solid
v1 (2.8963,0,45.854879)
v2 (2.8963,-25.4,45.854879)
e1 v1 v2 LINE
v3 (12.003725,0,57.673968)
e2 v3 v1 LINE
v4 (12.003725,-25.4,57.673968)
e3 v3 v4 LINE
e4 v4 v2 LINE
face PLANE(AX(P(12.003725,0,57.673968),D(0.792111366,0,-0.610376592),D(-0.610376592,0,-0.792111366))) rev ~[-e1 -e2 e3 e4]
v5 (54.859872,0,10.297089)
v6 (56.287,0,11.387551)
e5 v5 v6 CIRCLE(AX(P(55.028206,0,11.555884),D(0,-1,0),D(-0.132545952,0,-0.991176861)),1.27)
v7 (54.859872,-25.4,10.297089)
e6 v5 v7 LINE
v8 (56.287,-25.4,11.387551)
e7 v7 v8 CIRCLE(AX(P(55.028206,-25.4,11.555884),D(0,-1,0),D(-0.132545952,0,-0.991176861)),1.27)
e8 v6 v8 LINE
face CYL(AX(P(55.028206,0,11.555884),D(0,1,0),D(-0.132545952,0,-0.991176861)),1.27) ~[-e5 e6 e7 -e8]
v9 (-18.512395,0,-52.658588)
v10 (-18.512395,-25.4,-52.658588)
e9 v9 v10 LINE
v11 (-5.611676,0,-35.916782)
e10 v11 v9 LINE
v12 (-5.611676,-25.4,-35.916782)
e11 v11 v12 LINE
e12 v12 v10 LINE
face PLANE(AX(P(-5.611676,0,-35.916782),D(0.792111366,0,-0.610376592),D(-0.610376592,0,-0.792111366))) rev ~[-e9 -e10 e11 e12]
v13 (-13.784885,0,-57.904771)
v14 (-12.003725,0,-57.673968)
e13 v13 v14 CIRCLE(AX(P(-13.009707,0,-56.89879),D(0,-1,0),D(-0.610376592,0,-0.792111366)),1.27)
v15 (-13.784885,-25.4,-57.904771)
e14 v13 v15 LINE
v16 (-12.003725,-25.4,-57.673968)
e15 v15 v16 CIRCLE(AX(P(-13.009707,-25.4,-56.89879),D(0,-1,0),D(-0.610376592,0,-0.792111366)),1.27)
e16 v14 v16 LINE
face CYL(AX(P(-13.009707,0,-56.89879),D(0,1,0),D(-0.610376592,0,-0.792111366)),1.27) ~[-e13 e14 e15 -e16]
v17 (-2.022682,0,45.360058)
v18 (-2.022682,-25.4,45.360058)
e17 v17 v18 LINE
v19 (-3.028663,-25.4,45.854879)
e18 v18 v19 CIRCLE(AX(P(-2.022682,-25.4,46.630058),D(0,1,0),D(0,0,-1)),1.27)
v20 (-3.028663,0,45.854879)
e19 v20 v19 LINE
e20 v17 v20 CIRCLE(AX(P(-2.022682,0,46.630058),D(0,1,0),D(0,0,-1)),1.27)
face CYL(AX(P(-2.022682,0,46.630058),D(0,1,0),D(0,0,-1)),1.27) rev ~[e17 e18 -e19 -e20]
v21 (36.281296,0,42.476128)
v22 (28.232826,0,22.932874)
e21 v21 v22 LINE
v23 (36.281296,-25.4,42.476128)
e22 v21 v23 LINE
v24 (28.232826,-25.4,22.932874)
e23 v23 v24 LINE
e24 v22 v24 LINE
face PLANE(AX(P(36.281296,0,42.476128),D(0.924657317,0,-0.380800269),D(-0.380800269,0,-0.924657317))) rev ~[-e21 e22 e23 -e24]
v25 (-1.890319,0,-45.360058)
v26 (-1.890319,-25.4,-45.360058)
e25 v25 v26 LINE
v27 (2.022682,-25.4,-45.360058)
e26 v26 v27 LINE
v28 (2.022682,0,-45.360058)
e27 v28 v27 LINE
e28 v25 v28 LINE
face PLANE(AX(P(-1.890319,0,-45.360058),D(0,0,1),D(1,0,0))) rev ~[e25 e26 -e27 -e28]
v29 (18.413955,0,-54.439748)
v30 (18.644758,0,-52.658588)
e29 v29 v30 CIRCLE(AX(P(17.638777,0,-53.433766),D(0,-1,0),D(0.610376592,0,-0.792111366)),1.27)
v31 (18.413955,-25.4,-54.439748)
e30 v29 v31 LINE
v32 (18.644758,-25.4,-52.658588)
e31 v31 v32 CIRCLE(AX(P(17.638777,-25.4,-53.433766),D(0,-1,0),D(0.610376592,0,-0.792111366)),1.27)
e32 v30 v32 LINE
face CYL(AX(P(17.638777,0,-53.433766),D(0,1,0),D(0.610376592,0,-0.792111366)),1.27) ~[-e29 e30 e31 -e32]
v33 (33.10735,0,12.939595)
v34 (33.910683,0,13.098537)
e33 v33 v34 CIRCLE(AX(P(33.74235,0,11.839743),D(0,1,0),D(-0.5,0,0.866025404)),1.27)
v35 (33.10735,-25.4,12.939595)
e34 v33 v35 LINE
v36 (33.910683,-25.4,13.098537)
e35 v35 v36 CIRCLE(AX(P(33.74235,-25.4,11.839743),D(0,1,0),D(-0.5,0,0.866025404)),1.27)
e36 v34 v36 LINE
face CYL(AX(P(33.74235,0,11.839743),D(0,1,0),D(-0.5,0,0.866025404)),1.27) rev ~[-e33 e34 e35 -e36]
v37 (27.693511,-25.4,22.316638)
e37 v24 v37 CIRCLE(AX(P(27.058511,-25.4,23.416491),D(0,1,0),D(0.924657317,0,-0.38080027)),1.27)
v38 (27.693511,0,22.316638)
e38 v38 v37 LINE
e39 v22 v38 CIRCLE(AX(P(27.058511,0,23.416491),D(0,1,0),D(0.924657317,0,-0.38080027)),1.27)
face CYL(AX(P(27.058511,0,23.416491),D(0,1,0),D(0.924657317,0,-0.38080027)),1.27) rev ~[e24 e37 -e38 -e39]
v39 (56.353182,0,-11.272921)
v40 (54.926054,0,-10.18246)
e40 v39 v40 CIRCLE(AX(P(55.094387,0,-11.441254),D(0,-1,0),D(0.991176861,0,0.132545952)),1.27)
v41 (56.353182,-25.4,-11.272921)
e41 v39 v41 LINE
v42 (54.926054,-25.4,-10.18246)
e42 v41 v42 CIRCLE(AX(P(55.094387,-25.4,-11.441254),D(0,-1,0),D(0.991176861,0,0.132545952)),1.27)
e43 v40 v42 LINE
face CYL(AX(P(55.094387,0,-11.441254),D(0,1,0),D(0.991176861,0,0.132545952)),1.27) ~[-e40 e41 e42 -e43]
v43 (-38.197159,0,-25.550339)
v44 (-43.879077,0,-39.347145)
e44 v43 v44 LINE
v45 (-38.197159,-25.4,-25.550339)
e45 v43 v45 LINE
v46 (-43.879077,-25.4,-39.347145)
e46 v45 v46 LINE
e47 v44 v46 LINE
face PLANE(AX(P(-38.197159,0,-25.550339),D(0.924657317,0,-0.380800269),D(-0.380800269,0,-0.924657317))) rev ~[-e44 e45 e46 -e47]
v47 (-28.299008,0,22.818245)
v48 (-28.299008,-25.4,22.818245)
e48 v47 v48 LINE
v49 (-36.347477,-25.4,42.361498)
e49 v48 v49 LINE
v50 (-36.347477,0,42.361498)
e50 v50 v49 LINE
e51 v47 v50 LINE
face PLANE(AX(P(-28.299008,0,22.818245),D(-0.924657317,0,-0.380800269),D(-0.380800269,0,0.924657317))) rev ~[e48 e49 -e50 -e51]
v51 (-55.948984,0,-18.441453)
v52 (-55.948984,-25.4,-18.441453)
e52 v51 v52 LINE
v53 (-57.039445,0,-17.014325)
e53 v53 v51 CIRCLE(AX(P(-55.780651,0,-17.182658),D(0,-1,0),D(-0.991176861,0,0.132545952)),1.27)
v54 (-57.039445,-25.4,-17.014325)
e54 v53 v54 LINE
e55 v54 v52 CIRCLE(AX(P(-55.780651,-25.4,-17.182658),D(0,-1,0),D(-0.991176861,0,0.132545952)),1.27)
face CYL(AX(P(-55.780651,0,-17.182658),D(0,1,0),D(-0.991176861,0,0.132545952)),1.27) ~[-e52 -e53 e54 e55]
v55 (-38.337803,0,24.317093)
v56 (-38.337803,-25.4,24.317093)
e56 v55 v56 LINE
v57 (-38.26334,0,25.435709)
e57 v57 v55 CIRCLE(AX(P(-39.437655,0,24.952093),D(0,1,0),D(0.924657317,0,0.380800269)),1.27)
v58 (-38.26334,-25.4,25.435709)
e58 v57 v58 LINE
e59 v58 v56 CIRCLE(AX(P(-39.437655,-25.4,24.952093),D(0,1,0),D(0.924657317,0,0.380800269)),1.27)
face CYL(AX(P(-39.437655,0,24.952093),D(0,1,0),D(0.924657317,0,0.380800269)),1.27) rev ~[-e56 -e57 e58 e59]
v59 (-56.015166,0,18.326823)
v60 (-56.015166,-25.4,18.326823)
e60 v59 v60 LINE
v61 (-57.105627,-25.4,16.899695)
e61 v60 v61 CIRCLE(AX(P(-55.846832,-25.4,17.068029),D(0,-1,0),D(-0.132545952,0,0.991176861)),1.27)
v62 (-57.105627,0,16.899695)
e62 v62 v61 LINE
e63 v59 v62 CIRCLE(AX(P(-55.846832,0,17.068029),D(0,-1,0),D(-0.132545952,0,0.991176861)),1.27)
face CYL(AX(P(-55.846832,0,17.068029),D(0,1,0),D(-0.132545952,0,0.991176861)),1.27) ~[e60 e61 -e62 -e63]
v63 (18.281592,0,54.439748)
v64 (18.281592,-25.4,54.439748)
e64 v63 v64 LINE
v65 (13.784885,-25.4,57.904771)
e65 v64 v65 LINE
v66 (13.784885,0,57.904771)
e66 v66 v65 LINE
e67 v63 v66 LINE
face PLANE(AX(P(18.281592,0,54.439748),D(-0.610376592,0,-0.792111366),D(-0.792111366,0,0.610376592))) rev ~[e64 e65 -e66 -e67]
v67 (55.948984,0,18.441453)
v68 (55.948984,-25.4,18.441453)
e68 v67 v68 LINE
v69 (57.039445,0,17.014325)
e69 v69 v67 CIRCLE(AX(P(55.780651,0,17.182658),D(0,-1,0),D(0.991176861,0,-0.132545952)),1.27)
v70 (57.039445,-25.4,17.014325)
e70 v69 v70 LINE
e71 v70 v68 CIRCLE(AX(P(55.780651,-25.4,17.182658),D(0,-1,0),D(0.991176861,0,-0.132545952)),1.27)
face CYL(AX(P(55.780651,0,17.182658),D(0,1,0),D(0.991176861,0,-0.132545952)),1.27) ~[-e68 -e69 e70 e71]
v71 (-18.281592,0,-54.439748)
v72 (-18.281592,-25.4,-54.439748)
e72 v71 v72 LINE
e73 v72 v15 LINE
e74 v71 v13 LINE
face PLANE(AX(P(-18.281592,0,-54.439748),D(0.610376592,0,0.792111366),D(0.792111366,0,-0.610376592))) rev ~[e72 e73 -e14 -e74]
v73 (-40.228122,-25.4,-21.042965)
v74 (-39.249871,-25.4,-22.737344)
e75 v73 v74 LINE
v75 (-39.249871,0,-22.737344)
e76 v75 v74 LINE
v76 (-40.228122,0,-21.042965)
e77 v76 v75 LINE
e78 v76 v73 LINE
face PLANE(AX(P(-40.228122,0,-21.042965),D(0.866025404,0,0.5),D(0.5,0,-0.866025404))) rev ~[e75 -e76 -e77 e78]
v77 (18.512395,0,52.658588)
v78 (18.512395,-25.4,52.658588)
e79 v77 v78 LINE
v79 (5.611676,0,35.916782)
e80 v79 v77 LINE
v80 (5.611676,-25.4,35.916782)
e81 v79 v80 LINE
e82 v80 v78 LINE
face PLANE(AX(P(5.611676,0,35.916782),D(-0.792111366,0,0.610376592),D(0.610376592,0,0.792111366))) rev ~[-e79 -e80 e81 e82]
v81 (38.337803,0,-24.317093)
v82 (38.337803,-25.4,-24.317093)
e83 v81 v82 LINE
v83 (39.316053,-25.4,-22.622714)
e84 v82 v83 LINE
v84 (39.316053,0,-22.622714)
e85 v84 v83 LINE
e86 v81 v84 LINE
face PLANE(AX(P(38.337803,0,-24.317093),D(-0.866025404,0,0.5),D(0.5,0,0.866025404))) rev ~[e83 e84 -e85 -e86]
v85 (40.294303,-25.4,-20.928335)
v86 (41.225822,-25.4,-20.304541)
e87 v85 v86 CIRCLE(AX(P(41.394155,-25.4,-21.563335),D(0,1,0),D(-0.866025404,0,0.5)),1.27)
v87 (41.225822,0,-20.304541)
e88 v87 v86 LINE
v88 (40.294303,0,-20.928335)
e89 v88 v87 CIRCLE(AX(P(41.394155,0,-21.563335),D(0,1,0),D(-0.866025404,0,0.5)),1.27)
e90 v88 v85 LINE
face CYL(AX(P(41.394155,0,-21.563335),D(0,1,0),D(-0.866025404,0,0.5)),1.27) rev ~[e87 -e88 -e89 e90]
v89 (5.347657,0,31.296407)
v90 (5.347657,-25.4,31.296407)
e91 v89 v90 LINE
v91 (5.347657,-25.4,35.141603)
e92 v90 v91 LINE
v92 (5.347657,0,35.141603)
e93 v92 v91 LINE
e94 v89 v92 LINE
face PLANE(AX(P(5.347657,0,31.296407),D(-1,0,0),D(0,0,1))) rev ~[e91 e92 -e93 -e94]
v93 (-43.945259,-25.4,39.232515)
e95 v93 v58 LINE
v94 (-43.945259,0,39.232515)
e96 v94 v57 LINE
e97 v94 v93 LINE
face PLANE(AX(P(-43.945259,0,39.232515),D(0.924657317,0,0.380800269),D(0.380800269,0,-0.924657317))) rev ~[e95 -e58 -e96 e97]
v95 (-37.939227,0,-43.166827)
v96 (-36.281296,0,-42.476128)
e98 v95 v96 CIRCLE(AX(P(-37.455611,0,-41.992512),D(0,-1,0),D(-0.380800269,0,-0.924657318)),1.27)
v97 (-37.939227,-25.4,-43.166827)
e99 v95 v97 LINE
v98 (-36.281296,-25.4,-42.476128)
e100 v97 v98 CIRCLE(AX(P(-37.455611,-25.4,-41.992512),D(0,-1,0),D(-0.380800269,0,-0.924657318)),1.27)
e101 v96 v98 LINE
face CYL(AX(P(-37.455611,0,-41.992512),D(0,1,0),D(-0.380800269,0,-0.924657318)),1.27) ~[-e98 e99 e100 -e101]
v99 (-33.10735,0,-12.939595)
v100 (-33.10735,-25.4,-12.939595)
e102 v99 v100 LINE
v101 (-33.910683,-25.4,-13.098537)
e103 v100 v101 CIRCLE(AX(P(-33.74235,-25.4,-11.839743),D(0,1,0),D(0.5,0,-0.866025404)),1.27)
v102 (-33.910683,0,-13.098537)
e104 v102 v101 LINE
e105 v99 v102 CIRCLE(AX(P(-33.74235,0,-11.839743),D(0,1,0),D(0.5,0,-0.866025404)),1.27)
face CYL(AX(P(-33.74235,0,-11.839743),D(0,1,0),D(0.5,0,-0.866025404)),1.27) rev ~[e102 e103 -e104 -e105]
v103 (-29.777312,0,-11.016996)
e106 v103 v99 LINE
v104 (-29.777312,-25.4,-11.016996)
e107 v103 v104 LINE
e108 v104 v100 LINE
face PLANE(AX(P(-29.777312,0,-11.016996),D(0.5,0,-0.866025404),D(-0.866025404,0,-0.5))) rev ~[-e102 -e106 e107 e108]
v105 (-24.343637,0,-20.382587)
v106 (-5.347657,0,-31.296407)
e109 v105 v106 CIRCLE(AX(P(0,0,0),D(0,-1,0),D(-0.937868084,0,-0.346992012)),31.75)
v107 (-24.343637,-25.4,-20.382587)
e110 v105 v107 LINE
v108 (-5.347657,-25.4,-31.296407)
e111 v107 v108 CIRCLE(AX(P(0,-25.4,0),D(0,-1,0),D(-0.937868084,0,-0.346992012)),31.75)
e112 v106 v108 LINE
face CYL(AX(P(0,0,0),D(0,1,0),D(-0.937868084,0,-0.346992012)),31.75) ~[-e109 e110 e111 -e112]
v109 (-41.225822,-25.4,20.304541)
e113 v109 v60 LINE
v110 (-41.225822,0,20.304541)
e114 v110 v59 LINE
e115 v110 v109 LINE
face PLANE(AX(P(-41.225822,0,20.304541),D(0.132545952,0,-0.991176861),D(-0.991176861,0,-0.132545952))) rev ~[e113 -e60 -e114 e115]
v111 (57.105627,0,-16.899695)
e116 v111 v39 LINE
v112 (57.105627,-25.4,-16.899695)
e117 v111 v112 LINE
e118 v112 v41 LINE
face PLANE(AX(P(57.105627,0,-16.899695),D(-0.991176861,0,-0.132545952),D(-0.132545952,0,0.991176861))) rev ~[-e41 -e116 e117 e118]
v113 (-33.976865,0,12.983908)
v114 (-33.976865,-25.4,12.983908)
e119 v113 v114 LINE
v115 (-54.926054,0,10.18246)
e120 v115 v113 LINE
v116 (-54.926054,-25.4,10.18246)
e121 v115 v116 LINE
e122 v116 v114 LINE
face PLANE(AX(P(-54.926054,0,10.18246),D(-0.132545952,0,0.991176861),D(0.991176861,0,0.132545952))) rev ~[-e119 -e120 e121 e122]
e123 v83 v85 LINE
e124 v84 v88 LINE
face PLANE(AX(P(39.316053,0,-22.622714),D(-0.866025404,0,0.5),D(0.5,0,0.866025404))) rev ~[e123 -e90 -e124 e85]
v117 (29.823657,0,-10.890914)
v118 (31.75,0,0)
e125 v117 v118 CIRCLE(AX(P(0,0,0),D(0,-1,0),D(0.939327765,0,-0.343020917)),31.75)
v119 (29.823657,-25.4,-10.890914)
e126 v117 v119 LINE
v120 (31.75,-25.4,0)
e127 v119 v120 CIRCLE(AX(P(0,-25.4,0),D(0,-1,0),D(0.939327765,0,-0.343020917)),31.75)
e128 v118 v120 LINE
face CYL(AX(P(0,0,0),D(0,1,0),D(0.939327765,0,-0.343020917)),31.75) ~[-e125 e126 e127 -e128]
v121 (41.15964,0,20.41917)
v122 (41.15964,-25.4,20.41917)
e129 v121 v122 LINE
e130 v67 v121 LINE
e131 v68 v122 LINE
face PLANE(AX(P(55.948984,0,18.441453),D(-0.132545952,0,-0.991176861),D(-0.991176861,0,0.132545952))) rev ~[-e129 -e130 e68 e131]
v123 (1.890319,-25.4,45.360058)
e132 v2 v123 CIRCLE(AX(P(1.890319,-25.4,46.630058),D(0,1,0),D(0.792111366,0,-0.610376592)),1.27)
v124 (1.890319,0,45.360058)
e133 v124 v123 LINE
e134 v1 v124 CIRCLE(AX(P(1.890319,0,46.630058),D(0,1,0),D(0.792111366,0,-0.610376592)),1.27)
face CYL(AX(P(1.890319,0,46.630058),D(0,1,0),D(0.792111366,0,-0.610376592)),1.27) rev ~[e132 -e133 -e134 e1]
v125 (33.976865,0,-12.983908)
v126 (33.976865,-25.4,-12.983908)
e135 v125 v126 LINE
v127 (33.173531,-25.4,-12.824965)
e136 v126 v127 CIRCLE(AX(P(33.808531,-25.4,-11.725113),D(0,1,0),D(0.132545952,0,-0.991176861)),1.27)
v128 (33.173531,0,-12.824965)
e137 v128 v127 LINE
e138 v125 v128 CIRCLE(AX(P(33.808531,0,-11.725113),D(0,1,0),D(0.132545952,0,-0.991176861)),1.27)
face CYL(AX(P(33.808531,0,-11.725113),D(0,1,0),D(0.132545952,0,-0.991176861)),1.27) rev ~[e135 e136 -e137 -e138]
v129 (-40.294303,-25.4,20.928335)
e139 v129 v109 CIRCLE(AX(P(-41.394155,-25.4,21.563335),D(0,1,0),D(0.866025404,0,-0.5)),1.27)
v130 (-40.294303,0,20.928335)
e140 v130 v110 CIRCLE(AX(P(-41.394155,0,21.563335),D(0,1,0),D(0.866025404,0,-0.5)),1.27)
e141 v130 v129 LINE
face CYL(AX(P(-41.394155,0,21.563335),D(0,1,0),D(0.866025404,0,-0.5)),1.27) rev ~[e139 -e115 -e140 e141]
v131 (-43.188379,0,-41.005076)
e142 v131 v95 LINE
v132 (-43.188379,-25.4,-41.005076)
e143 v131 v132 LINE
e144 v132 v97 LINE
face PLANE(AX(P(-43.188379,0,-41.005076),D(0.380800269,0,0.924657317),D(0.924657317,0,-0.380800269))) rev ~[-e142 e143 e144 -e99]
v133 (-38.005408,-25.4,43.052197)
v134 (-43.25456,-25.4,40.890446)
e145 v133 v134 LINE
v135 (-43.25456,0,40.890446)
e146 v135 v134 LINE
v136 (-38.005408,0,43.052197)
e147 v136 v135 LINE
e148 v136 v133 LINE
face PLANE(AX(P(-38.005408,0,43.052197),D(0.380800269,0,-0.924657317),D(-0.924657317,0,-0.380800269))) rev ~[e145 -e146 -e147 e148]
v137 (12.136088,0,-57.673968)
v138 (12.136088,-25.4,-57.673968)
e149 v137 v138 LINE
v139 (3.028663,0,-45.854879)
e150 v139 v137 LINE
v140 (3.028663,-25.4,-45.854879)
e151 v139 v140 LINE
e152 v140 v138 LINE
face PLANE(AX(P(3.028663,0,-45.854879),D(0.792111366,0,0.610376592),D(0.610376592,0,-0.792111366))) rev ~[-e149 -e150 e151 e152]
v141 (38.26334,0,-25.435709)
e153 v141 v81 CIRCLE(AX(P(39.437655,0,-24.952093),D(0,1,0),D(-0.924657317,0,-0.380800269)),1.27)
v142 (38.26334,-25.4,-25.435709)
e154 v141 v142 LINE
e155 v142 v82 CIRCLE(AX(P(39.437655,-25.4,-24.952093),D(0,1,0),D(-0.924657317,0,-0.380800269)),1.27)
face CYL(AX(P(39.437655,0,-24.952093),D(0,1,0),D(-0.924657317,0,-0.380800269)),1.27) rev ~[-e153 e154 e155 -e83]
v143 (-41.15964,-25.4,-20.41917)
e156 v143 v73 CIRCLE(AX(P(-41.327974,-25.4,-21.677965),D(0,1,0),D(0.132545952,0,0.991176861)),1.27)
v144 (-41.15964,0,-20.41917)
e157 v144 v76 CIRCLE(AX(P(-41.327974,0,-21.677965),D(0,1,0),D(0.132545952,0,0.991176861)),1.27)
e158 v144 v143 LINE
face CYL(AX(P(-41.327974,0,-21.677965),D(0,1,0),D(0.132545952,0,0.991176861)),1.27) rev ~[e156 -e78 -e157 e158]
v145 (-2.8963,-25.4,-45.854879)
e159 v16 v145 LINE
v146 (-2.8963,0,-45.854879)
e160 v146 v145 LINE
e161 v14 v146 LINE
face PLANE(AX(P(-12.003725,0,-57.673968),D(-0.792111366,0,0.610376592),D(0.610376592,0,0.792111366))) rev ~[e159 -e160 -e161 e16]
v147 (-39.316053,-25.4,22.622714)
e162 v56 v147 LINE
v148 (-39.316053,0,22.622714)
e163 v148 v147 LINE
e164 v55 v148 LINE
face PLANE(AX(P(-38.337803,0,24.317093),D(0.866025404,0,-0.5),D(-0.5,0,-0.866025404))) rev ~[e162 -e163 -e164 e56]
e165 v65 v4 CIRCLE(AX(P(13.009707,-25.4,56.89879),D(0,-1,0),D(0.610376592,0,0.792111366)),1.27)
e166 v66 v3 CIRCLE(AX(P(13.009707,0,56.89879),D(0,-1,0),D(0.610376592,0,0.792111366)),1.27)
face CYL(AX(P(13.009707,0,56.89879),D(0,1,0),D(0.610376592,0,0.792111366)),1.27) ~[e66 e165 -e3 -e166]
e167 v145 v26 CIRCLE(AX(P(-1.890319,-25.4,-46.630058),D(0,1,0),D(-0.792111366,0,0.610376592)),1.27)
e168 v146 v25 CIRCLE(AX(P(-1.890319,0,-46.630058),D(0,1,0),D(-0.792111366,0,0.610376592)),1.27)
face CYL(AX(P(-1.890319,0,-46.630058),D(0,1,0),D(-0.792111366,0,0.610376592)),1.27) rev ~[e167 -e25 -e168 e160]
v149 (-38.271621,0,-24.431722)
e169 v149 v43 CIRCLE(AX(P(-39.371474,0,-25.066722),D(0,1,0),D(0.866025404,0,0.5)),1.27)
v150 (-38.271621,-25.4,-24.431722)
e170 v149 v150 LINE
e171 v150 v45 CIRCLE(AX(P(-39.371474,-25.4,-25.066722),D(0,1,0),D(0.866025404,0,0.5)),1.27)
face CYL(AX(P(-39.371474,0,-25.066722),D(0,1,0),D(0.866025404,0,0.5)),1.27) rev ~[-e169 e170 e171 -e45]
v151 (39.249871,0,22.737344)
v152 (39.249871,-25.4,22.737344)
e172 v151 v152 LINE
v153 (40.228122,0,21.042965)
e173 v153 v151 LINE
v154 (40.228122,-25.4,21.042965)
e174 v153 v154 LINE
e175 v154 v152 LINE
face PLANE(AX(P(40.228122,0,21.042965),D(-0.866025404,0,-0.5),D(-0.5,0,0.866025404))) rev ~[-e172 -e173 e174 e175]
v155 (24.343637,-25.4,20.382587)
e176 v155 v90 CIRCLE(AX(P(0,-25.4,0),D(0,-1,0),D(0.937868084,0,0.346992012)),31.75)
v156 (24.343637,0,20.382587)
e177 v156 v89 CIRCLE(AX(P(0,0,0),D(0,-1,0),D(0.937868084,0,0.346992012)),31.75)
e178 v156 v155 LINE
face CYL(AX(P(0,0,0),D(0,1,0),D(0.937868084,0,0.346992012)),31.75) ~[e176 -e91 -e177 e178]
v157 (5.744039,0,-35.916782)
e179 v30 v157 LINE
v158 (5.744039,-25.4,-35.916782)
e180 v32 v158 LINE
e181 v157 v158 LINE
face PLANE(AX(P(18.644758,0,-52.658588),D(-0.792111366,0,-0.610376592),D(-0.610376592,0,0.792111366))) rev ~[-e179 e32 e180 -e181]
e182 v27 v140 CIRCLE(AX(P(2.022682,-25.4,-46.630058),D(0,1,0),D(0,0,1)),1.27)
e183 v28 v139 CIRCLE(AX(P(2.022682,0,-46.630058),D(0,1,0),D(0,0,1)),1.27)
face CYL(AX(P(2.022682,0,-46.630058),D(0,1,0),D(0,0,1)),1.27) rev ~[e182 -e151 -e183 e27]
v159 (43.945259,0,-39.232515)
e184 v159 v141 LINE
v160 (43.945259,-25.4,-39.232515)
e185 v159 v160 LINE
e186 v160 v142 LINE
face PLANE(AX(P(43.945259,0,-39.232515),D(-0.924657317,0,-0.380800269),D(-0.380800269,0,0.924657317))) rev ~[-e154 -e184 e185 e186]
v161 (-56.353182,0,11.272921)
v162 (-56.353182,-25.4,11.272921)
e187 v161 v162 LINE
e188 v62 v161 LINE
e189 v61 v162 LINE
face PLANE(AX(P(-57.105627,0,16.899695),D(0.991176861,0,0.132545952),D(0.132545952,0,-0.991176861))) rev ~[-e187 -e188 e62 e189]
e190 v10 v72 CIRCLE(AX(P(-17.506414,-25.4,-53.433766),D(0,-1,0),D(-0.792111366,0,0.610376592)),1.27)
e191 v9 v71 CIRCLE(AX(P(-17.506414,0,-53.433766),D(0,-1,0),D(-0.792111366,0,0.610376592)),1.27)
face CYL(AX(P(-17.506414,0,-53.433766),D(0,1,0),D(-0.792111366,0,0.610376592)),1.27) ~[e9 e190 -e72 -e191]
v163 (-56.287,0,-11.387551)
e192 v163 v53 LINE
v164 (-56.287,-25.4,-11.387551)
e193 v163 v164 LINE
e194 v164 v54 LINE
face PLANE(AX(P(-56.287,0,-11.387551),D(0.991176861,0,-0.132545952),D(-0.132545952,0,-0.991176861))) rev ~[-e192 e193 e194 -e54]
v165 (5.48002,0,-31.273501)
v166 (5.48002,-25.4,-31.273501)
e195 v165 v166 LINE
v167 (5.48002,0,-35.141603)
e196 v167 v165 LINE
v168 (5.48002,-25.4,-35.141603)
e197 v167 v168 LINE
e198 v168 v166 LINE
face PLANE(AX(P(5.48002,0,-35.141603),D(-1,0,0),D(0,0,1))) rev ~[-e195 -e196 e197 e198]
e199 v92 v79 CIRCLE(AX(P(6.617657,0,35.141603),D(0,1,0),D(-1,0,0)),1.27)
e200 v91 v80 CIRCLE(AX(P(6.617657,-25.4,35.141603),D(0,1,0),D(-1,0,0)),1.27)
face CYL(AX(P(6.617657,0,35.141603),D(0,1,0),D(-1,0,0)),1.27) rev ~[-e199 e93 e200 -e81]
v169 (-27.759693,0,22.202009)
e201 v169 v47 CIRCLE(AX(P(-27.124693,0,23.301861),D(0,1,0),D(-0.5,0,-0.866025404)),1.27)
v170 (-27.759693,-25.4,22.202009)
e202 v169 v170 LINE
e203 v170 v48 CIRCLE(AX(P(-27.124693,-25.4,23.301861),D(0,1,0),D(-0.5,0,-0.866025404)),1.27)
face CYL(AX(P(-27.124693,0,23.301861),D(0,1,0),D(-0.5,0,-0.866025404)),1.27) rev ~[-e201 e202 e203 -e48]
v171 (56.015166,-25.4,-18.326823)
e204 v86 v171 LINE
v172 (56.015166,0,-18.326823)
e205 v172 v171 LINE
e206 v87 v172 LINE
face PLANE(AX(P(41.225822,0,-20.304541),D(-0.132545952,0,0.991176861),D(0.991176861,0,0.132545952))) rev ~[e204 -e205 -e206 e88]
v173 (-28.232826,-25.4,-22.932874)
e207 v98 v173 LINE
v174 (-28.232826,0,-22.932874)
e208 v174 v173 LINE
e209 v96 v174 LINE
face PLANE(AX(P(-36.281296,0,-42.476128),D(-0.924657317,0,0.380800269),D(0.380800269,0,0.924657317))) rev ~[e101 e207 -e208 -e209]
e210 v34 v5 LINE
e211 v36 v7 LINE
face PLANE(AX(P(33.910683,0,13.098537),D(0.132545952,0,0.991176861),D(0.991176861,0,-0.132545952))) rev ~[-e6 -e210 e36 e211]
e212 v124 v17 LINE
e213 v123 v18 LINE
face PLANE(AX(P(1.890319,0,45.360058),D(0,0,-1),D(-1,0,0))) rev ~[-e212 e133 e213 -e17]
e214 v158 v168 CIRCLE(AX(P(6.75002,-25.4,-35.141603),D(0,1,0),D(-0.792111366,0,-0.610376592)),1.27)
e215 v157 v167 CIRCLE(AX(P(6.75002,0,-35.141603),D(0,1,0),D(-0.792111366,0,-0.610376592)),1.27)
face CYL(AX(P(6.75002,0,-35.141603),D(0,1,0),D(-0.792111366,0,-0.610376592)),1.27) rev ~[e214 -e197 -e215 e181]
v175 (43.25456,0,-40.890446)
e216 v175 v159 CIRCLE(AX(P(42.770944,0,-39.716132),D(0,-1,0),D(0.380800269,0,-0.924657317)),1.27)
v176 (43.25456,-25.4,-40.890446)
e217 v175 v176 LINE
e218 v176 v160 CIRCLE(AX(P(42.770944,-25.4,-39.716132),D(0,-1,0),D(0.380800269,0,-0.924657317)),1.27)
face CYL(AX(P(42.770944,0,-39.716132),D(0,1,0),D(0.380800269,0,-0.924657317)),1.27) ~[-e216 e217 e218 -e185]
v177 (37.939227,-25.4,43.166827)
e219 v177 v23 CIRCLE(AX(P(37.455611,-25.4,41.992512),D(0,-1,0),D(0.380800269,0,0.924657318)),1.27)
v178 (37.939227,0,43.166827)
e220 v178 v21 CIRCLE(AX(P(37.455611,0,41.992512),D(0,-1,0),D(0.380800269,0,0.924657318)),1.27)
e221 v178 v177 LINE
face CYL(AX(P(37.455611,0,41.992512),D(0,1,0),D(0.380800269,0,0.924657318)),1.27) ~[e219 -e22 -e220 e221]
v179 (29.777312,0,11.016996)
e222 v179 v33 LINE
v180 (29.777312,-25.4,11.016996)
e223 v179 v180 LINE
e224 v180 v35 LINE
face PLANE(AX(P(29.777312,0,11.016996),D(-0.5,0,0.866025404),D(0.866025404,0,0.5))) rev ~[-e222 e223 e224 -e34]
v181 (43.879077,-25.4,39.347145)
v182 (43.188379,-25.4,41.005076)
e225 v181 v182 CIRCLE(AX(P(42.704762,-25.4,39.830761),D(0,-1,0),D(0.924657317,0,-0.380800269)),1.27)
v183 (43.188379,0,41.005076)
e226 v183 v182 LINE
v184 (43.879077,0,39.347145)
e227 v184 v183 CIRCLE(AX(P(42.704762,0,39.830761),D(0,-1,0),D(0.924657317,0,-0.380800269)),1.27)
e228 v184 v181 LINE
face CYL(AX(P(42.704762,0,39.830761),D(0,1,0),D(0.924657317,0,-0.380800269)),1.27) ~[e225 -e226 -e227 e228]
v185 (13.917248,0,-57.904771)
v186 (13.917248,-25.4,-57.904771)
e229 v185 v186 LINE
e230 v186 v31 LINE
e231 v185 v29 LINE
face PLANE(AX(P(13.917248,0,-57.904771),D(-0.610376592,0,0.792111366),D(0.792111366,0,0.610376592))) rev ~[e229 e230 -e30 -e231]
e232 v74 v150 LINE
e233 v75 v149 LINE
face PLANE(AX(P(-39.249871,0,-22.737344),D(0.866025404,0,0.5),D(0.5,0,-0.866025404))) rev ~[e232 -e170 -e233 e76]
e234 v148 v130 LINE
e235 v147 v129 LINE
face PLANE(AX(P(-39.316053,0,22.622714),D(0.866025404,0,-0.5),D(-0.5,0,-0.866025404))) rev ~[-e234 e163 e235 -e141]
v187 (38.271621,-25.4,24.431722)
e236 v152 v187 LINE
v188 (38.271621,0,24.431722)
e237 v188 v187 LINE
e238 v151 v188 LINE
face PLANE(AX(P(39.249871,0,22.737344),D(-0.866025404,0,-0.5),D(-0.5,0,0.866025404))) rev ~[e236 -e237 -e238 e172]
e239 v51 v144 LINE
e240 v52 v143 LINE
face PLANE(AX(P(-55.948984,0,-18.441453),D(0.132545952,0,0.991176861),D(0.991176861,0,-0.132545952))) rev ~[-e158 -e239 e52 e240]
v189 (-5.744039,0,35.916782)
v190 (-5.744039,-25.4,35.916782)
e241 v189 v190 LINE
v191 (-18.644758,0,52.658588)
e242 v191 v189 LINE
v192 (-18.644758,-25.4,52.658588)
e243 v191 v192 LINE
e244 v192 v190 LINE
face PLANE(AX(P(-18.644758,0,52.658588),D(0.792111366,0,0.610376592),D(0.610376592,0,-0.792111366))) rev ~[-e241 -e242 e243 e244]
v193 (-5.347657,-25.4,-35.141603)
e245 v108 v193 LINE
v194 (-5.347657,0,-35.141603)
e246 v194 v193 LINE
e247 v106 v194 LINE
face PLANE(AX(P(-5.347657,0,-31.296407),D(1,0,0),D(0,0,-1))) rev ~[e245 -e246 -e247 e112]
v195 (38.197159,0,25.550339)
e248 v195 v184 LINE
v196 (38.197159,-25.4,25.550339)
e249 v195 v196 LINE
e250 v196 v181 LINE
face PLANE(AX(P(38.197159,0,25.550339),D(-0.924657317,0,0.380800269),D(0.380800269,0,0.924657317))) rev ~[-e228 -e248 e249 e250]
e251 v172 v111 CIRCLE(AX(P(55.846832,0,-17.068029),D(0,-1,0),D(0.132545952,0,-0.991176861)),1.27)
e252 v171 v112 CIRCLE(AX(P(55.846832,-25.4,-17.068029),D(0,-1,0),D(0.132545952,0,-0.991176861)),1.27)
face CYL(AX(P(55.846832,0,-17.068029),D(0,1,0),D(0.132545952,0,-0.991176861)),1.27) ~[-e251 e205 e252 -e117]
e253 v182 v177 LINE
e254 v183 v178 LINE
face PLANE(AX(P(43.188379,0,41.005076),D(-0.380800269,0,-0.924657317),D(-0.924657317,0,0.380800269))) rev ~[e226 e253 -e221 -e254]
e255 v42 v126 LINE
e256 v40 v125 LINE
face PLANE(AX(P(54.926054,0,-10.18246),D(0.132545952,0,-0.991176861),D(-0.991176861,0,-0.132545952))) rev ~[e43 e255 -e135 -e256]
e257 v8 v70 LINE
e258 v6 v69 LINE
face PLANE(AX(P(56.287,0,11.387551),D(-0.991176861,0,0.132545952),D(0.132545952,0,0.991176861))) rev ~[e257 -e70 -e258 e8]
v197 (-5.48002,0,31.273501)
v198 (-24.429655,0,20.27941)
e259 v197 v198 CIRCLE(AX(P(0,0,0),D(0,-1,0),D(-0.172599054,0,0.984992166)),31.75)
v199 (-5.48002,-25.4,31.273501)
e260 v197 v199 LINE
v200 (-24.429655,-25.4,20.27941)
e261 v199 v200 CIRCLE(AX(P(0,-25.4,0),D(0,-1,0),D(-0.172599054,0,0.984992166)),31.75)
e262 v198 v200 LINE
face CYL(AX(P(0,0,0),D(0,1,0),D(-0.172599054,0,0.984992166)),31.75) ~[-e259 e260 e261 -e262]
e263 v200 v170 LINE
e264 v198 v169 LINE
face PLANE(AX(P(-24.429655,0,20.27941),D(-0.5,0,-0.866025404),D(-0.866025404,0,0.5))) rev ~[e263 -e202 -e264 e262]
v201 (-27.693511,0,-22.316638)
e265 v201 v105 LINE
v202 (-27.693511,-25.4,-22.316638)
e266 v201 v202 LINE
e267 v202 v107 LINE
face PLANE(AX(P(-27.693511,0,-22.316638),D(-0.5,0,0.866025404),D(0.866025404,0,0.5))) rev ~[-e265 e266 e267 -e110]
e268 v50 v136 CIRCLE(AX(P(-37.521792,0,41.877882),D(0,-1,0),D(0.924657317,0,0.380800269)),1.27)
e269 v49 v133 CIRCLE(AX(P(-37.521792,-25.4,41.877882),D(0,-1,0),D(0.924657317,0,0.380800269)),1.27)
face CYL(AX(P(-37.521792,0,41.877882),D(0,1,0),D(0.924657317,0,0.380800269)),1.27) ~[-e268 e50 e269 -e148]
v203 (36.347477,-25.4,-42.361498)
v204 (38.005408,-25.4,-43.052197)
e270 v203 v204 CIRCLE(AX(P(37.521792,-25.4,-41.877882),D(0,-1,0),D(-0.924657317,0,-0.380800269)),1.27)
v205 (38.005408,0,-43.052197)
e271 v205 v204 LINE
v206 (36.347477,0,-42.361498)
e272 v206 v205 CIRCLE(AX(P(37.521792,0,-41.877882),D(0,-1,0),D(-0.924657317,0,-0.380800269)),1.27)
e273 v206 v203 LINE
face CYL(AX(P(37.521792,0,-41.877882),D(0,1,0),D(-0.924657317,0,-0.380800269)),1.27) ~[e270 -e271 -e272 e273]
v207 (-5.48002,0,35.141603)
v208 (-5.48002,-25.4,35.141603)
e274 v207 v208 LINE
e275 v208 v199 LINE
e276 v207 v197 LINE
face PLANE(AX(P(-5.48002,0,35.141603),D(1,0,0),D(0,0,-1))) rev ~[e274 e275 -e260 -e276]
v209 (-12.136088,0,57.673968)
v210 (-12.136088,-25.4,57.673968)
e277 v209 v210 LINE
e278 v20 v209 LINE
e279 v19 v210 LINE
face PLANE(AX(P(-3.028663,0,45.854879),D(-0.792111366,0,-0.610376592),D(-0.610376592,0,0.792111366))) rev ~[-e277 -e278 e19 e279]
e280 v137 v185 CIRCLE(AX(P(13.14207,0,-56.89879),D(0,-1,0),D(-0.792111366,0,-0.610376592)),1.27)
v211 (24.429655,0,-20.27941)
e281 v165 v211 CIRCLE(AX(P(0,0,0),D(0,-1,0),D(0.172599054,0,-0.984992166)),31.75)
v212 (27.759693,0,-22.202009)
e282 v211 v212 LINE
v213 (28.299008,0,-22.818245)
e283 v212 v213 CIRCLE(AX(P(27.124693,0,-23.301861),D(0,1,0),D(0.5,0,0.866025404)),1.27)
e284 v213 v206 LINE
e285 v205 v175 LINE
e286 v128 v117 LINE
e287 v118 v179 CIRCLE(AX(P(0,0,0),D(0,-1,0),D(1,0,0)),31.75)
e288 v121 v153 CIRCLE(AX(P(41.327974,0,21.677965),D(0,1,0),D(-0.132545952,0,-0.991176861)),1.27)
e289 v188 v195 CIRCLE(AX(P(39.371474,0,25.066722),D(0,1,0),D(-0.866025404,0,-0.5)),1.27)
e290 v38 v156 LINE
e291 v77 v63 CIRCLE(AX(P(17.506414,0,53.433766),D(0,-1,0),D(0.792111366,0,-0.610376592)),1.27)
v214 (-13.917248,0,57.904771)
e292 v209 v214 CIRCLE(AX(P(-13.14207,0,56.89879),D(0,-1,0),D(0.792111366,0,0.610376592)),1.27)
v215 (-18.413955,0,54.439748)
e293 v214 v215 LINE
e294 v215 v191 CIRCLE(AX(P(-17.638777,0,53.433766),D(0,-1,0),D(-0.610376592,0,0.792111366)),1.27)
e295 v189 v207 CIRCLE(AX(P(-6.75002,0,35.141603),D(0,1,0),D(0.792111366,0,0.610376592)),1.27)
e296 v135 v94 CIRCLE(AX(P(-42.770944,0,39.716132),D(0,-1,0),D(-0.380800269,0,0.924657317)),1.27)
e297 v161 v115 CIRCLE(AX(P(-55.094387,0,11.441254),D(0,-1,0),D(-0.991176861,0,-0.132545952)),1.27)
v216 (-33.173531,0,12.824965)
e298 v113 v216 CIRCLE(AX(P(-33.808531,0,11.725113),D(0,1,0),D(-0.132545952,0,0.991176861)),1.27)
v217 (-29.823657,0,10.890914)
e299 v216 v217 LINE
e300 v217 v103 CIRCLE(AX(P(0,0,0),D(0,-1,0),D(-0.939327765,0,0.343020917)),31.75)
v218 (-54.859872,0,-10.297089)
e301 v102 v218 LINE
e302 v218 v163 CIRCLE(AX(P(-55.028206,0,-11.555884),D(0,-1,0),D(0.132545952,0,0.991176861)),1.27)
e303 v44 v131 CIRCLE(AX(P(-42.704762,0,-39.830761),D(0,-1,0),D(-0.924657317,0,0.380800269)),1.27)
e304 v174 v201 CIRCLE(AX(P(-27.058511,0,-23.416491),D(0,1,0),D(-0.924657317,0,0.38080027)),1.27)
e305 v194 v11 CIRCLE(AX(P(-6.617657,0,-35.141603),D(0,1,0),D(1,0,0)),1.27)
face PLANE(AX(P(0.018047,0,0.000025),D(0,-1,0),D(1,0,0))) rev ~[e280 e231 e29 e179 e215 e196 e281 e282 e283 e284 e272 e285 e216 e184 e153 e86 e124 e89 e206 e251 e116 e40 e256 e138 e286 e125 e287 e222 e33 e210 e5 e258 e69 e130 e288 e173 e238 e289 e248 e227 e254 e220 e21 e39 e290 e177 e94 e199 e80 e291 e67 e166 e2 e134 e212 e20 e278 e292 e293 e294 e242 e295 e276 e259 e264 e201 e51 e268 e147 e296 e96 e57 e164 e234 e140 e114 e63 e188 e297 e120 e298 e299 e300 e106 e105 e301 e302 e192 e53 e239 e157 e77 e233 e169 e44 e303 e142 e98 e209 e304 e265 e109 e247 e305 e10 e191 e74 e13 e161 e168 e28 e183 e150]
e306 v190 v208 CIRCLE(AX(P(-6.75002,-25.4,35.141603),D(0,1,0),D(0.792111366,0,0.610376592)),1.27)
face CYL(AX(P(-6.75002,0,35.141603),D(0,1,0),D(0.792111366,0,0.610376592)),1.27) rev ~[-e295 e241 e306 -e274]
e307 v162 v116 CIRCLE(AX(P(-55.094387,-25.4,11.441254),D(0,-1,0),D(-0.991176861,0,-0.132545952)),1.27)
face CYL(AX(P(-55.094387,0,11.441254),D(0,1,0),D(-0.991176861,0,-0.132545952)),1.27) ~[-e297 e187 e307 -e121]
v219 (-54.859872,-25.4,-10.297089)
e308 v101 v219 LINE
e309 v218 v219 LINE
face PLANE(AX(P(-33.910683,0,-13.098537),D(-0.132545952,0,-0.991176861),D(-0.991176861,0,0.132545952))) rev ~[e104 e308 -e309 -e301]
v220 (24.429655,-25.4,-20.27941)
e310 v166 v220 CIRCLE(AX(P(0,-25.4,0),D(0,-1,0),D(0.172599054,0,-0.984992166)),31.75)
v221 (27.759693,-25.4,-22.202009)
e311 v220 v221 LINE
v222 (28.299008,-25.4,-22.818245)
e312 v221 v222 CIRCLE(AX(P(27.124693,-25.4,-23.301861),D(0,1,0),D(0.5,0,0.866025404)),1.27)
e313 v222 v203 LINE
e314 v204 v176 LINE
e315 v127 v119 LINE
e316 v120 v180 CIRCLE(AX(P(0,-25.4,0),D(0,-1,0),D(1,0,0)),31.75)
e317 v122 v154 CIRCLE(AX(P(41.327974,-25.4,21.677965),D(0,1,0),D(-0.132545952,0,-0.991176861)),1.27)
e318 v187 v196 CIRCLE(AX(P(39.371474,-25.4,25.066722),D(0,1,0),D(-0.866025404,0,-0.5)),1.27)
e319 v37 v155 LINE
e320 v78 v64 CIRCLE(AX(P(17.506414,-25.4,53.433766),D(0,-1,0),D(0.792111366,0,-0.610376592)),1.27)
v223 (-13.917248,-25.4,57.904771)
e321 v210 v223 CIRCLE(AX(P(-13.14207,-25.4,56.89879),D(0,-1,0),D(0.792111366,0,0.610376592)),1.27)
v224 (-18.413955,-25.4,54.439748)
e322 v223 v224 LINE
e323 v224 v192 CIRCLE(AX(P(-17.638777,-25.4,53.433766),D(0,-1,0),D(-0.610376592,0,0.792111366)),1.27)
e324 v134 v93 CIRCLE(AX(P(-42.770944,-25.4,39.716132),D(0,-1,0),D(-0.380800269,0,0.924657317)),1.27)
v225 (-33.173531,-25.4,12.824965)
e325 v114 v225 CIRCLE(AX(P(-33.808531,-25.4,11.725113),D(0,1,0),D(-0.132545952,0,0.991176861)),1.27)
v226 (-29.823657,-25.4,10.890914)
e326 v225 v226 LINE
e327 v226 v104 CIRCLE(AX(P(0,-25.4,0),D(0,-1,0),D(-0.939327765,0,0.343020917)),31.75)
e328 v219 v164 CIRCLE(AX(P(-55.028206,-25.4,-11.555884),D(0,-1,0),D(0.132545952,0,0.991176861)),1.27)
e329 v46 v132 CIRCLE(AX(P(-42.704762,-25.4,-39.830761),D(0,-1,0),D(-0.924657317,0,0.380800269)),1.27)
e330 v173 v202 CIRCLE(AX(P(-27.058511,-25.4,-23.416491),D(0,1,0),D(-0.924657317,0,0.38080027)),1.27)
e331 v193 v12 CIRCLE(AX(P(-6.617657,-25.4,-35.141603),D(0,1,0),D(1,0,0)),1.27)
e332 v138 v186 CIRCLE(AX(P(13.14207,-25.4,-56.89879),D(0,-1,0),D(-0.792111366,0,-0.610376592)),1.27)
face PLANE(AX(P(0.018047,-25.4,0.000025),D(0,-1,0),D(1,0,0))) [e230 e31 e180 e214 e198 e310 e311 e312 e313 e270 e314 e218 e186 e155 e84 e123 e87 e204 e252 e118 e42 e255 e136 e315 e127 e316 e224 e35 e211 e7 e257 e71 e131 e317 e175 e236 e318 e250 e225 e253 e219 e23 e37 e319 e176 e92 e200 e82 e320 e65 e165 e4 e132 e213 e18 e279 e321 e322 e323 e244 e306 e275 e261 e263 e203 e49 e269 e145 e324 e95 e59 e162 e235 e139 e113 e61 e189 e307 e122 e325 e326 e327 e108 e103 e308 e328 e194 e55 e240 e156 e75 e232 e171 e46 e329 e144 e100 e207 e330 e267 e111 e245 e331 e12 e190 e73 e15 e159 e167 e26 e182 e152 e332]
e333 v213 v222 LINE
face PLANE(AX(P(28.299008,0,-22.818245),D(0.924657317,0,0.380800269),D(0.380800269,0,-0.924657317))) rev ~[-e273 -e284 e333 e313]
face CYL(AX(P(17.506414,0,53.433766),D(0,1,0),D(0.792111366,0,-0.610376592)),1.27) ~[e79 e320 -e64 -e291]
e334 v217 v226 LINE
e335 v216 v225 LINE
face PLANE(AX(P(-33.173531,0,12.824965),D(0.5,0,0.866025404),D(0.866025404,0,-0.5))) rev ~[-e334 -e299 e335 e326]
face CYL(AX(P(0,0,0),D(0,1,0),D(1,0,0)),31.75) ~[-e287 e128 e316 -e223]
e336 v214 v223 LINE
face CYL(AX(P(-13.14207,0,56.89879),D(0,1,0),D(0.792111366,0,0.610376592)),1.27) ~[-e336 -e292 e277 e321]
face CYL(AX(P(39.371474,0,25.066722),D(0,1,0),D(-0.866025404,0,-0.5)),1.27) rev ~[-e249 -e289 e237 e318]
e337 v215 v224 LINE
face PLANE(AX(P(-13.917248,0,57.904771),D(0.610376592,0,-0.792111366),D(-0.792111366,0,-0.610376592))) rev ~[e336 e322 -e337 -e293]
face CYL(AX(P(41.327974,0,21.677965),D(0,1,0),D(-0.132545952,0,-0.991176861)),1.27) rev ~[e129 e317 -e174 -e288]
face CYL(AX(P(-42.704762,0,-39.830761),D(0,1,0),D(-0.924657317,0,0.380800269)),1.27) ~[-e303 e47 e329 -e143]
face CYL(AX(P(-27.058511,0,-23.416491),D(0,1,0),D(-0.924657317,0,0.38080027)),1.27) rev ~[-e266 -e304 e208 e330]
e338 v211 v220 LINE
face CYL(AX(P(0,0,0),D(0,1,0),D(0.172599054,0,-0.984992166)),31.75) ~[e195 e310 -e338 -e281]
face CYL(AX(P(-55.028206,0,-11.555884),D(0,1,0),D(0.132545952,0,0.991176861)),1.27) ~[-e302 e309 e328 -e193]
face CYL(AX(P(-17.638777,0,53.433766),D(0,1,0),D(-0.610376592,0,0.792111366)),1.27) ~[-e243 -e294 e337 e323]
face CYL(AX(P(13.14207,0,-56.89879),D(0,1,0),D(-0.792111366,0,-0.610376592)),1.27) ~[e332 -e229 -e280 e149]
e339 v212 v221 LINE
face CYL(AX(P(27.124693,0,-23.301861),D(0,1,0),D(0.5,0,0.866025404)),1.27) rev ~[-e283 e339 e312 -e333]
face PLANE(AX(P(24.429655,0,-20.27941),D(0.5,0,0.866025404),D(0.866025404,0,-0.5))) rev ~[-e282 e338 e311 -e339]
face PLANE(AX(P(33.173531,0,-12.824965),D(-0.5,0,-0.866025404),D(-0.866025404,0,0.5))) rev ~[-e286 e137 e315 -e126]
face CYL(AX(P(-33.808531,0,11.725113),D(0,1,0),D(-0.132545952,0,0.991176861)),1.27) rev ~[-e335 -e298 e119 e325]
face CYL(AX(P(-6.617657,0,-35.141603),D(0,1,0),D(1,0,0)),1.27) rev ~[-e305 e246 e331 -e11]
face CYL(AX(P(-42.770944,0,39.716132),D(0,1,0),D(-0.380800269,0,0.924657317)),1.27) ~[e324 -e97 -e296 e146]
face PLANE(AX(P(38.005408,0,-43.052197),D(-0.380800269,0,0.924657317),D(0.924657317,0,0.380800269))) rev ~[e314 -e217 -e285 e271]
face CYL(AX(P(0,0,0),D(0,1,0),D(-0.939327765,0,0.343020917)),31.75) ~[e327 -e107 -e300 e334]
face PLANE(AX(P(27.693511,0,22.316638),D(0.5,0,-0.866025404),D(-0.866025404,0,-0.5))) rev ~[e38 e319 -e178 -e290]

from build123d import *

# Parameters (mm, degrees)
F1_DEPTH = 25.4


# Not quite as in the source:
# - a feature names something its author has since deleted; it is built from what else it names


with BuildPart() as f1:
    # F0 (on Front) → F1 (new body)
    with BuildSketch(Plane.XZ):
        with BuildLine():
            ThreePointArc((29.8236565437, -10.8909141198), (31.2647053022, -5.529982131), (31.75, 0))
            ThreePointArc((31.75, 0), (31.2529370271, 5.5961082175), (29.7773116736, 11.0169963917))
            ThreePointArc((29.7773116736, 11.0169963917), (27.4626625114, 15.9331311356), (24.34363657, 20.3825871407))
            ThreePointArc((24.34363657, 20.3825871407), (15.8167978227, 27.529827581), (5.3476570882, 31.2964065616))
            ThreePointArc((5.3476570882, 31.2964065616), (-0.0671650695, 31.7499289582), (-5.4800199737, 31.2735012605))
            ThreePointArc((-5.4800199737, 31.2735012605), (-15.9331311356, 27.4626625114), (-24.4296545854, 20.2794101699))
            ThreePointArc((-24.4296545854, 20.2794101699), (-27.529827581, 15.8167978227), (-29.8236565437, 10.8909141198))
            ThreePointArc((-29.8236565437, 10.8909141198), (-31.7499289582, -0.0671650695), (-29.7773116736, -11.0169963917))
            ThreePointArc((-29.7773116736, -11.0169963917), (-27.4626625114, -15.9331311356), (-24.34363657, -20.3825871407))
            ThreePointArc((-24.34363657, -20.3825871407), (-15.8167978227, -27.529827581), (-5.3476570882, -31.2964065616))
            ThreePointArc((-5.3476570882, -31.2964065616), (0.0671650695, -31.7499289582), (5.4800199737, -31.2735012605))
            ThreePointArc((5.4800199737, -31.2735012605), (15.9331311356, -27.4626625114), (24.4296545854, -20.2794101699))
            ThreePointArc((24.4296545854, -20.2794101699), (27.529827581, -15.8167978227), (29.8236565437, -10.8909141198))
        make_face()
        with BuildLine():
            ThreePointArc((-29.8236565437, 10.8909141198), (-27.529827581, 15.8167978227), (-24.4296545854, 20.2794101699))
            Line((-24.4296545854, 20.2794101699), (-27.7596928163, 22.2020086389))
            ThreePointArc((-27.7596928163, 22.2020086389), (-28.0803819304, 22.4654648728), (-28.2990076095, 22.8182445595))
            Line((-28.2990076095, 22.8182445595), (-36.3474772559, 42.3614984651))
            ThreePointArc((-36.3474772559, 42.3614984651), (-37.0333944907, 43.0502164715), (-38.0054083913, 43.0521969161))
            Line((-38.0054083913, 43.0521969161), (-43.2545602789, 40.8904463786))
            ThreePointArc((-43.2545602789, 40.8904463786), (-43.9432782853, 40.2045291438), (-43.9452587299, 39.2325152431))
            Line((-43.9452587299, 39.2325152431), (-38.2633402939, 25.4357091987))
            ThreePointArc((-38.2633402939, 25.4357091987), (-38.17045953, 24.8677399071), (-38.3378028243, 24.3170928565))
            Line((-38.3378028243, 24.3170928565), (-39.3160529196, 22.622713989))
            Line((-39.3160529196, 22.622713989), (-40.2943030148, 20.9283351216))
            ThreePointArc((-40.2943030148, 20.9283351216), (-40.687505702, 20.5080880523), (-41.225821919, 20.3045405075))
            Line((-41.225821919, 20.3045405075), (-56.0151656626, 18.3268231931))
            ThreePointArc((-56.0151656626, 18.3268231931), (-56.8559641711, 17.8391011274), (-57.1056269181, 16.8996952205))
            Line((-57.1056269181, 16.8996952205), (-56.3531818565, 11.2729210687))
            ThreePointArc((-56.3531818565, 11.2729210687), (-55.8654597908, 10.4321225602), (-54.9260538839, 10.1824598132))
            Line((-54.9260538839, 10.1824598132), (-33.9768647058, 12.9839075907))
            ThreePointArc((-33.9768647058, 12.9839075907), (-33.5620356955, 12.970962042), (-33.1735313472, 12.8249652394))
            Line((-33.1735313472, 12.8249652394), (-29.8236565437, 10.8909141198))
        make_face()
        with BuildLine():
            ThreePointArc((-5.4800199737, 31.2735012605), (-0.0671650695, 31.7499289582), (5.3476570882, 31.2964065616))
            Line((5.3476570882, 31.2964065616), (5.3476570882, 35.1416034996))
            ThreePointArc((5.3476570882, 35.1416034996), (5.4154723224, 35.551056536), (5.6116756536, 35.9167817715))
            Line((5.6116756536, 35.9167817715), (18.5123951852, 52.6585878997))
            ThreePointArc((18.5123951852, 52.6585878997), (18.7658838574, 53.596968653), (18.2815920225, 54.4397476062))
            Line((18.2815920225, 54.4397476062), (13.7848851965, 57.9047712204))
            ThreePointArc((13.7848851965, 57.9047712204), (12.8465044431, 58.1582598926), (12.00372549, 57.6739680576))
            Line((12.00372549, 57.6739680576), (2.8963001824, 45.8548793275))
            ThreePointArc((2.8963001824, 45.8548793275), (2.4508647292, 45.4904575807), (1.8903187477, 45.3600575994))
            Line((1.8903187477, 45.3600575994), (-0.0661814427, 45.3600575994))
            Line((-0.0661814427, 45.3600575994), (-2.0226816332, 45.3600575994))
            ThreePointArc((-2.0226816332, 45.3600575994), (-2.5832276147, 45.4904575807), (-3.0286630678, 45.8548793275))
            Line((-3.0286630678, 45.8548793275), (-12.1360883754, 57.6739680576))
            ThreePointArc((-12.1360883754, 57.6739680576), (-12.9788673285, 58.1582598926), (-13.9172480819, 57.9047712204))
            Line((-13.9172480819, 57.9047712204), (-18.4139549079, 54.4397476062))
            ThreePointArc((-18.4139549079, 54.4397476062), (-18.8982467429, 53.596968653), (-18.6447580707, 52.6585878997))
            Line((-18.6447580707, 52.6585878997), (-5.744038539, 35.9167817715))
            ThreePointArc((-5.744038539, 35.9167817715), (-5.5478352079, 35.551056536), (-5.4800199737, 35.1416034996))
            Line((-5.4800199737, 35.1416034996), (-5.4800199737, 31.2735012605))
        make_face()
        with BuildLine():
            ThreePointArc((24.34363657, 20.3825871407), (27.4626625114, 15.9331311356), (29.7773116736, 11.0169963917))
            Line((29.7773116736, 11.0169963917), (33.1073499045, 12.9395948607))
            ThreePointArc((33.1073499045, 12.9395948607), (33.4958542528, 13.0855916633), (33.9106832631, 13.098537212))
            Line((33.9106832631, 13.098537212), (54.8598724411, 10.2970894345))
            ThreePointArc((54.8598724411, 10.2970894345), (55.7992783481, 10.5467521815), (56.2870004138, 11.38755069))
            Line((56.2870004138, 11.38755069), (57.0394454754, 17.0143248418))
            ThreePointArc((57.0394454754, 17.0143248418), (56.7897827284, 17.9537307487), (55.9489842199, 18.4414528144))
            Line((55.9489842199, 18.4414528144), (41.1596404763, 20.4191701289))
            ThreePointArc((41.1596404763, 20.4191701289), (40.6213242593, 20.6227176736), (40.2281215721, 21.0429647429))
            Line((40.2281215721, 21.0429647429), (39.2498714768, 22.7373436104))
            Line((39.2498714768, 22.7373436104), (38.2716213816, 24.4317224778))
            ThreePointArc((38.2716213816, 24.4317224778), (38.1042780873, 24.9823695284), (38.1971588512, 25.55033882))
            Line((38.1971588512, 25.55033882), (43.8790772872, 39.3471448645))
            ThreePointArc((43.8790772872, 39.3471448645), (43.8770968426, 40.3191587651), (43.1883788362, 41.0050759999))
            Line((43.1883788362, 41.0050759999), (37.9392269486, 43.1668265375))
            ThreePointArc((37.9392269486, 43.1668265375), (36.9672130479, 43.1648460928), (36.2812958132, 42.4761280865))
            Line((36.2812958132, 42.4761280865), (28.2328261668, 22.9328741809))
            ThreePointArc((28.2328261668, 22.9328741809), (28.0142004876, 22.5800944941), (27.6935113736, 22.3166382603))
            Line((27.6935113736, 22.3166382603), (24.34363657, 20.3825871407))
        make_face()
        with BuildLine():
            Line((33.1735313472, -12.8249652394), (29.8236565437, -10.8909141198))
            ThreePointArc((29.8236565437, -10.8909141198), (27.529827581, -15.8167978227), (24.4296545854, -20.2794101699))
            Line((24.4296545854, -20.2794101699), (27.7596928163, -22.2020086389))
            ThreePointArc((27.7596928163, -22.2020086389), (28.0803819304, -22.4654648728), (28.2990076095, -22.8182445595))
            Line((28.2990076095, -22.8182445595), (36.3474772559, -42.3614984651))
            ThreePointArc((36.3474772559, -42.3614984651), (37.0333944907, -43.0502164715), (38.0054083913, -43.0521969161))
            Line((38.0054083913, -43.0521969161), (43.2545602789, -40.8904463786))
            ThreePointArc((43.2545602789, -40.8904463786), (43.9432782853, -40.2045291438), (43.9452587299, -39.2325152431))
            Line((43.9452587299, -39.2325152431), (38.2633402939, -25.4357091987))
            ThreePointArc((38.2633402939, -25.4357091987), (38.17045953, -24.8677399071), (38.3378028243, -24.3170928565))
            Line((38.3378028243, -24.3170928565), (39.3160529196, -22.622713989))
            Line((39.3160529196, -22.622713989), (40.2943030148, -20.9283351216))
            ThreePointArc((40.2943030148, -20.9283351216), (40.687505702, -20.5080880523), (41.225821919, -20.3045405075))
            Line((41.225821919, -20.3045405075), (56.0151656626, -18.3268231931))
            ThreePointArc((56.0151656626, -18.3268231931), (56.8559641711, -17.8391011274), (57.1056269181, -16.8996952205))
            Line((57.1056269181, -16.8996952205), (56.3531818565, -11.2729210687))
            ThreePointArc((56.3531818565, -11.2729210687), (55.8654597908, -10.4321225602), (54.9260538839, -10.1824598132))
            Line((54.9260538839, -10.1824598132), (33.9768647058, -12.9839075907))
            ThreePointArc((33.9768647058, -12.9839075907), (33.5620356955, -12.970962042), (33.1735313472, -12.8249652394))
        make_face()
        with BuildLine():
            Line((5.4800199737, -35.1416034996), (5.4800199737, -31.2735012605))
            ThreePointArc((5.4800199737, -31.2735012605), (0.0671650695, -31.7499289582), (-5.3476570882, -31.2964065616))
            Line((-5.3476570882, -31.2964065616), (-5.3476570882, -35.1416034996))
            ThreePointArc((-5.3476570882, -35.1416034996), (-5.4154723224, -35.551056536), (-5.6116756536, -35.9167817715))
            Line((-5.6116756536, -35.9167817715), (-18.5123951852, -52.6585878997))
            ThreePointArc((-18.5123951852, -52.6585878997), (-18.7658838574, -53.596968653), (-18.2815920225, -54.4397476062))
            Line((-18.2815920225, -54.4397476062), (-13.7848851965, -57.9047712204))
            ThreePointArc((-13.7848851965, -57.9047712204), (-12.8465044431, -58.1582598926), (-12.00372549, -57.6739680576))
            Line((-12.00372549, -57.6739680576), (-2.8963001824, -45.8548793275))
            ThreePointArc((-2.8963001824, -45.8548793275), (-2.4508647292, -45.4904575807), (-1.8903187477, -45.3600575994))
            Line((-1.8903187477, -45.3600575994), (0.0661814427, -45.3600575994))
            Line((0.0661814427, -45.3600575994), (2.0226816332, -45.3600575994))
            ThreePointArc((2.0226816332, -45.3600575994), (2.5832276147, -45.4904575807), (3.0286630678, -45.8548793275))
            Line((3.0286630678, -45.8548793275), (12.1360883754, -57.6739680576))
            ThreePointArc((12.1360883754, -57.6739680576), (12.9788673285, -58.1582598926), (13.9172480819, -57.9047712204))
            Line((13.9172480819, -57.9047712204), (18.4139549079, -54.4397476062))
            ThreePointArc((18.4139549079, -54.4397476062), (18.8982467429, -53.596968653), (18.6447580707, -52.6585878997))
            Line((18.6447580707, -52.6585878997), (5.744038539, -35.9167817715))
            ThreePointArc((5.744038539, -35.9167817715), (5.5478352079, -35.551056536), (5.4800199737, -35.1416034996))
        make_face()
        with BuildLine():
            Line((-27.6935113736, -22.3166382603), (-24.34363657, -20.3825871407))
            ThreePointArc((-24.34363657, -20.3825871407), (-27.4626625114, -15.9331311356), (-29.7773116736, -11.0169963917))
            Line((-29.7773116736, -11.0169963917), (-33.1073499045, -12.9395948607))
            ThreePointArc((-33.1073499045, -12.9395948607), (-33.4958542528, -13.0855916633), (-33.9106832631, -13.098537212))
            Line((-33.9106832631, -13.098537212), (-54.8598724411, -10.2970894345))
            ThreePointArc((-54.8598724411, -10.2970894345), (-55.7992783481, -10.5467521815), (-56.2870004138, -11.38755069))
            Line((-56.2870004138, -11.38755069), (-57.0394454754, -17.0143248418))
            ThreePointArc((-57.0394454754, -17.0143248418), (-56.7897827284, -17.9537307487), (-55.9489842199, -18.4414528144))
            Line((-55.9489842199, -18.4414528144), (-41.1596404763, -20.4191701289))
            ThreePointArc((-41.1596404763, -20.4191701289), (-40.6213242593, -20.6227176736), (-40.2281215721, -21.0429647429))
            Line((-40.2281215721, -21.0429647429), (-39.2498714768, -22.7373436104))
            Line((-39.2498714768, -22.7373436104), (-38.2716213816, -24.4317224778))
            ThreePointArc((-38.2716213816, -24.4317224778), (-38.1042780873, -24.9823695284), (-38.1971588512, -25.55033882))
            Line((-38.1971588512, -25.55033882), (-43.8790772872, -39.3471448645))
            ThreePointArc((-43.8790772872, -39.3471448645), (-43.8770968426, -40.3191587651), (-43.1883788362, -41.0050759999))
            Line((-43.1883788362, -41.0050759999), (-37.9392269486, -43.1668265375))
            ThreePointArc((-37.9392269486, -43.1668265375), (-36.9672130479, -43.1648460928), (-36.2812958132, -42.4761280865))
            Line((-36.2812958132, -42.4761280865), (-28.2328261668, -22.9328741809))
            ThreePointArc((-28.2328261668, -22.9328741809), (-28.0142004876, -22.5800944941), (-27.6935113736, -22.3166382603))
        make_face()
    extrude(amount=F1_DEPTH)


solid = f1.part
